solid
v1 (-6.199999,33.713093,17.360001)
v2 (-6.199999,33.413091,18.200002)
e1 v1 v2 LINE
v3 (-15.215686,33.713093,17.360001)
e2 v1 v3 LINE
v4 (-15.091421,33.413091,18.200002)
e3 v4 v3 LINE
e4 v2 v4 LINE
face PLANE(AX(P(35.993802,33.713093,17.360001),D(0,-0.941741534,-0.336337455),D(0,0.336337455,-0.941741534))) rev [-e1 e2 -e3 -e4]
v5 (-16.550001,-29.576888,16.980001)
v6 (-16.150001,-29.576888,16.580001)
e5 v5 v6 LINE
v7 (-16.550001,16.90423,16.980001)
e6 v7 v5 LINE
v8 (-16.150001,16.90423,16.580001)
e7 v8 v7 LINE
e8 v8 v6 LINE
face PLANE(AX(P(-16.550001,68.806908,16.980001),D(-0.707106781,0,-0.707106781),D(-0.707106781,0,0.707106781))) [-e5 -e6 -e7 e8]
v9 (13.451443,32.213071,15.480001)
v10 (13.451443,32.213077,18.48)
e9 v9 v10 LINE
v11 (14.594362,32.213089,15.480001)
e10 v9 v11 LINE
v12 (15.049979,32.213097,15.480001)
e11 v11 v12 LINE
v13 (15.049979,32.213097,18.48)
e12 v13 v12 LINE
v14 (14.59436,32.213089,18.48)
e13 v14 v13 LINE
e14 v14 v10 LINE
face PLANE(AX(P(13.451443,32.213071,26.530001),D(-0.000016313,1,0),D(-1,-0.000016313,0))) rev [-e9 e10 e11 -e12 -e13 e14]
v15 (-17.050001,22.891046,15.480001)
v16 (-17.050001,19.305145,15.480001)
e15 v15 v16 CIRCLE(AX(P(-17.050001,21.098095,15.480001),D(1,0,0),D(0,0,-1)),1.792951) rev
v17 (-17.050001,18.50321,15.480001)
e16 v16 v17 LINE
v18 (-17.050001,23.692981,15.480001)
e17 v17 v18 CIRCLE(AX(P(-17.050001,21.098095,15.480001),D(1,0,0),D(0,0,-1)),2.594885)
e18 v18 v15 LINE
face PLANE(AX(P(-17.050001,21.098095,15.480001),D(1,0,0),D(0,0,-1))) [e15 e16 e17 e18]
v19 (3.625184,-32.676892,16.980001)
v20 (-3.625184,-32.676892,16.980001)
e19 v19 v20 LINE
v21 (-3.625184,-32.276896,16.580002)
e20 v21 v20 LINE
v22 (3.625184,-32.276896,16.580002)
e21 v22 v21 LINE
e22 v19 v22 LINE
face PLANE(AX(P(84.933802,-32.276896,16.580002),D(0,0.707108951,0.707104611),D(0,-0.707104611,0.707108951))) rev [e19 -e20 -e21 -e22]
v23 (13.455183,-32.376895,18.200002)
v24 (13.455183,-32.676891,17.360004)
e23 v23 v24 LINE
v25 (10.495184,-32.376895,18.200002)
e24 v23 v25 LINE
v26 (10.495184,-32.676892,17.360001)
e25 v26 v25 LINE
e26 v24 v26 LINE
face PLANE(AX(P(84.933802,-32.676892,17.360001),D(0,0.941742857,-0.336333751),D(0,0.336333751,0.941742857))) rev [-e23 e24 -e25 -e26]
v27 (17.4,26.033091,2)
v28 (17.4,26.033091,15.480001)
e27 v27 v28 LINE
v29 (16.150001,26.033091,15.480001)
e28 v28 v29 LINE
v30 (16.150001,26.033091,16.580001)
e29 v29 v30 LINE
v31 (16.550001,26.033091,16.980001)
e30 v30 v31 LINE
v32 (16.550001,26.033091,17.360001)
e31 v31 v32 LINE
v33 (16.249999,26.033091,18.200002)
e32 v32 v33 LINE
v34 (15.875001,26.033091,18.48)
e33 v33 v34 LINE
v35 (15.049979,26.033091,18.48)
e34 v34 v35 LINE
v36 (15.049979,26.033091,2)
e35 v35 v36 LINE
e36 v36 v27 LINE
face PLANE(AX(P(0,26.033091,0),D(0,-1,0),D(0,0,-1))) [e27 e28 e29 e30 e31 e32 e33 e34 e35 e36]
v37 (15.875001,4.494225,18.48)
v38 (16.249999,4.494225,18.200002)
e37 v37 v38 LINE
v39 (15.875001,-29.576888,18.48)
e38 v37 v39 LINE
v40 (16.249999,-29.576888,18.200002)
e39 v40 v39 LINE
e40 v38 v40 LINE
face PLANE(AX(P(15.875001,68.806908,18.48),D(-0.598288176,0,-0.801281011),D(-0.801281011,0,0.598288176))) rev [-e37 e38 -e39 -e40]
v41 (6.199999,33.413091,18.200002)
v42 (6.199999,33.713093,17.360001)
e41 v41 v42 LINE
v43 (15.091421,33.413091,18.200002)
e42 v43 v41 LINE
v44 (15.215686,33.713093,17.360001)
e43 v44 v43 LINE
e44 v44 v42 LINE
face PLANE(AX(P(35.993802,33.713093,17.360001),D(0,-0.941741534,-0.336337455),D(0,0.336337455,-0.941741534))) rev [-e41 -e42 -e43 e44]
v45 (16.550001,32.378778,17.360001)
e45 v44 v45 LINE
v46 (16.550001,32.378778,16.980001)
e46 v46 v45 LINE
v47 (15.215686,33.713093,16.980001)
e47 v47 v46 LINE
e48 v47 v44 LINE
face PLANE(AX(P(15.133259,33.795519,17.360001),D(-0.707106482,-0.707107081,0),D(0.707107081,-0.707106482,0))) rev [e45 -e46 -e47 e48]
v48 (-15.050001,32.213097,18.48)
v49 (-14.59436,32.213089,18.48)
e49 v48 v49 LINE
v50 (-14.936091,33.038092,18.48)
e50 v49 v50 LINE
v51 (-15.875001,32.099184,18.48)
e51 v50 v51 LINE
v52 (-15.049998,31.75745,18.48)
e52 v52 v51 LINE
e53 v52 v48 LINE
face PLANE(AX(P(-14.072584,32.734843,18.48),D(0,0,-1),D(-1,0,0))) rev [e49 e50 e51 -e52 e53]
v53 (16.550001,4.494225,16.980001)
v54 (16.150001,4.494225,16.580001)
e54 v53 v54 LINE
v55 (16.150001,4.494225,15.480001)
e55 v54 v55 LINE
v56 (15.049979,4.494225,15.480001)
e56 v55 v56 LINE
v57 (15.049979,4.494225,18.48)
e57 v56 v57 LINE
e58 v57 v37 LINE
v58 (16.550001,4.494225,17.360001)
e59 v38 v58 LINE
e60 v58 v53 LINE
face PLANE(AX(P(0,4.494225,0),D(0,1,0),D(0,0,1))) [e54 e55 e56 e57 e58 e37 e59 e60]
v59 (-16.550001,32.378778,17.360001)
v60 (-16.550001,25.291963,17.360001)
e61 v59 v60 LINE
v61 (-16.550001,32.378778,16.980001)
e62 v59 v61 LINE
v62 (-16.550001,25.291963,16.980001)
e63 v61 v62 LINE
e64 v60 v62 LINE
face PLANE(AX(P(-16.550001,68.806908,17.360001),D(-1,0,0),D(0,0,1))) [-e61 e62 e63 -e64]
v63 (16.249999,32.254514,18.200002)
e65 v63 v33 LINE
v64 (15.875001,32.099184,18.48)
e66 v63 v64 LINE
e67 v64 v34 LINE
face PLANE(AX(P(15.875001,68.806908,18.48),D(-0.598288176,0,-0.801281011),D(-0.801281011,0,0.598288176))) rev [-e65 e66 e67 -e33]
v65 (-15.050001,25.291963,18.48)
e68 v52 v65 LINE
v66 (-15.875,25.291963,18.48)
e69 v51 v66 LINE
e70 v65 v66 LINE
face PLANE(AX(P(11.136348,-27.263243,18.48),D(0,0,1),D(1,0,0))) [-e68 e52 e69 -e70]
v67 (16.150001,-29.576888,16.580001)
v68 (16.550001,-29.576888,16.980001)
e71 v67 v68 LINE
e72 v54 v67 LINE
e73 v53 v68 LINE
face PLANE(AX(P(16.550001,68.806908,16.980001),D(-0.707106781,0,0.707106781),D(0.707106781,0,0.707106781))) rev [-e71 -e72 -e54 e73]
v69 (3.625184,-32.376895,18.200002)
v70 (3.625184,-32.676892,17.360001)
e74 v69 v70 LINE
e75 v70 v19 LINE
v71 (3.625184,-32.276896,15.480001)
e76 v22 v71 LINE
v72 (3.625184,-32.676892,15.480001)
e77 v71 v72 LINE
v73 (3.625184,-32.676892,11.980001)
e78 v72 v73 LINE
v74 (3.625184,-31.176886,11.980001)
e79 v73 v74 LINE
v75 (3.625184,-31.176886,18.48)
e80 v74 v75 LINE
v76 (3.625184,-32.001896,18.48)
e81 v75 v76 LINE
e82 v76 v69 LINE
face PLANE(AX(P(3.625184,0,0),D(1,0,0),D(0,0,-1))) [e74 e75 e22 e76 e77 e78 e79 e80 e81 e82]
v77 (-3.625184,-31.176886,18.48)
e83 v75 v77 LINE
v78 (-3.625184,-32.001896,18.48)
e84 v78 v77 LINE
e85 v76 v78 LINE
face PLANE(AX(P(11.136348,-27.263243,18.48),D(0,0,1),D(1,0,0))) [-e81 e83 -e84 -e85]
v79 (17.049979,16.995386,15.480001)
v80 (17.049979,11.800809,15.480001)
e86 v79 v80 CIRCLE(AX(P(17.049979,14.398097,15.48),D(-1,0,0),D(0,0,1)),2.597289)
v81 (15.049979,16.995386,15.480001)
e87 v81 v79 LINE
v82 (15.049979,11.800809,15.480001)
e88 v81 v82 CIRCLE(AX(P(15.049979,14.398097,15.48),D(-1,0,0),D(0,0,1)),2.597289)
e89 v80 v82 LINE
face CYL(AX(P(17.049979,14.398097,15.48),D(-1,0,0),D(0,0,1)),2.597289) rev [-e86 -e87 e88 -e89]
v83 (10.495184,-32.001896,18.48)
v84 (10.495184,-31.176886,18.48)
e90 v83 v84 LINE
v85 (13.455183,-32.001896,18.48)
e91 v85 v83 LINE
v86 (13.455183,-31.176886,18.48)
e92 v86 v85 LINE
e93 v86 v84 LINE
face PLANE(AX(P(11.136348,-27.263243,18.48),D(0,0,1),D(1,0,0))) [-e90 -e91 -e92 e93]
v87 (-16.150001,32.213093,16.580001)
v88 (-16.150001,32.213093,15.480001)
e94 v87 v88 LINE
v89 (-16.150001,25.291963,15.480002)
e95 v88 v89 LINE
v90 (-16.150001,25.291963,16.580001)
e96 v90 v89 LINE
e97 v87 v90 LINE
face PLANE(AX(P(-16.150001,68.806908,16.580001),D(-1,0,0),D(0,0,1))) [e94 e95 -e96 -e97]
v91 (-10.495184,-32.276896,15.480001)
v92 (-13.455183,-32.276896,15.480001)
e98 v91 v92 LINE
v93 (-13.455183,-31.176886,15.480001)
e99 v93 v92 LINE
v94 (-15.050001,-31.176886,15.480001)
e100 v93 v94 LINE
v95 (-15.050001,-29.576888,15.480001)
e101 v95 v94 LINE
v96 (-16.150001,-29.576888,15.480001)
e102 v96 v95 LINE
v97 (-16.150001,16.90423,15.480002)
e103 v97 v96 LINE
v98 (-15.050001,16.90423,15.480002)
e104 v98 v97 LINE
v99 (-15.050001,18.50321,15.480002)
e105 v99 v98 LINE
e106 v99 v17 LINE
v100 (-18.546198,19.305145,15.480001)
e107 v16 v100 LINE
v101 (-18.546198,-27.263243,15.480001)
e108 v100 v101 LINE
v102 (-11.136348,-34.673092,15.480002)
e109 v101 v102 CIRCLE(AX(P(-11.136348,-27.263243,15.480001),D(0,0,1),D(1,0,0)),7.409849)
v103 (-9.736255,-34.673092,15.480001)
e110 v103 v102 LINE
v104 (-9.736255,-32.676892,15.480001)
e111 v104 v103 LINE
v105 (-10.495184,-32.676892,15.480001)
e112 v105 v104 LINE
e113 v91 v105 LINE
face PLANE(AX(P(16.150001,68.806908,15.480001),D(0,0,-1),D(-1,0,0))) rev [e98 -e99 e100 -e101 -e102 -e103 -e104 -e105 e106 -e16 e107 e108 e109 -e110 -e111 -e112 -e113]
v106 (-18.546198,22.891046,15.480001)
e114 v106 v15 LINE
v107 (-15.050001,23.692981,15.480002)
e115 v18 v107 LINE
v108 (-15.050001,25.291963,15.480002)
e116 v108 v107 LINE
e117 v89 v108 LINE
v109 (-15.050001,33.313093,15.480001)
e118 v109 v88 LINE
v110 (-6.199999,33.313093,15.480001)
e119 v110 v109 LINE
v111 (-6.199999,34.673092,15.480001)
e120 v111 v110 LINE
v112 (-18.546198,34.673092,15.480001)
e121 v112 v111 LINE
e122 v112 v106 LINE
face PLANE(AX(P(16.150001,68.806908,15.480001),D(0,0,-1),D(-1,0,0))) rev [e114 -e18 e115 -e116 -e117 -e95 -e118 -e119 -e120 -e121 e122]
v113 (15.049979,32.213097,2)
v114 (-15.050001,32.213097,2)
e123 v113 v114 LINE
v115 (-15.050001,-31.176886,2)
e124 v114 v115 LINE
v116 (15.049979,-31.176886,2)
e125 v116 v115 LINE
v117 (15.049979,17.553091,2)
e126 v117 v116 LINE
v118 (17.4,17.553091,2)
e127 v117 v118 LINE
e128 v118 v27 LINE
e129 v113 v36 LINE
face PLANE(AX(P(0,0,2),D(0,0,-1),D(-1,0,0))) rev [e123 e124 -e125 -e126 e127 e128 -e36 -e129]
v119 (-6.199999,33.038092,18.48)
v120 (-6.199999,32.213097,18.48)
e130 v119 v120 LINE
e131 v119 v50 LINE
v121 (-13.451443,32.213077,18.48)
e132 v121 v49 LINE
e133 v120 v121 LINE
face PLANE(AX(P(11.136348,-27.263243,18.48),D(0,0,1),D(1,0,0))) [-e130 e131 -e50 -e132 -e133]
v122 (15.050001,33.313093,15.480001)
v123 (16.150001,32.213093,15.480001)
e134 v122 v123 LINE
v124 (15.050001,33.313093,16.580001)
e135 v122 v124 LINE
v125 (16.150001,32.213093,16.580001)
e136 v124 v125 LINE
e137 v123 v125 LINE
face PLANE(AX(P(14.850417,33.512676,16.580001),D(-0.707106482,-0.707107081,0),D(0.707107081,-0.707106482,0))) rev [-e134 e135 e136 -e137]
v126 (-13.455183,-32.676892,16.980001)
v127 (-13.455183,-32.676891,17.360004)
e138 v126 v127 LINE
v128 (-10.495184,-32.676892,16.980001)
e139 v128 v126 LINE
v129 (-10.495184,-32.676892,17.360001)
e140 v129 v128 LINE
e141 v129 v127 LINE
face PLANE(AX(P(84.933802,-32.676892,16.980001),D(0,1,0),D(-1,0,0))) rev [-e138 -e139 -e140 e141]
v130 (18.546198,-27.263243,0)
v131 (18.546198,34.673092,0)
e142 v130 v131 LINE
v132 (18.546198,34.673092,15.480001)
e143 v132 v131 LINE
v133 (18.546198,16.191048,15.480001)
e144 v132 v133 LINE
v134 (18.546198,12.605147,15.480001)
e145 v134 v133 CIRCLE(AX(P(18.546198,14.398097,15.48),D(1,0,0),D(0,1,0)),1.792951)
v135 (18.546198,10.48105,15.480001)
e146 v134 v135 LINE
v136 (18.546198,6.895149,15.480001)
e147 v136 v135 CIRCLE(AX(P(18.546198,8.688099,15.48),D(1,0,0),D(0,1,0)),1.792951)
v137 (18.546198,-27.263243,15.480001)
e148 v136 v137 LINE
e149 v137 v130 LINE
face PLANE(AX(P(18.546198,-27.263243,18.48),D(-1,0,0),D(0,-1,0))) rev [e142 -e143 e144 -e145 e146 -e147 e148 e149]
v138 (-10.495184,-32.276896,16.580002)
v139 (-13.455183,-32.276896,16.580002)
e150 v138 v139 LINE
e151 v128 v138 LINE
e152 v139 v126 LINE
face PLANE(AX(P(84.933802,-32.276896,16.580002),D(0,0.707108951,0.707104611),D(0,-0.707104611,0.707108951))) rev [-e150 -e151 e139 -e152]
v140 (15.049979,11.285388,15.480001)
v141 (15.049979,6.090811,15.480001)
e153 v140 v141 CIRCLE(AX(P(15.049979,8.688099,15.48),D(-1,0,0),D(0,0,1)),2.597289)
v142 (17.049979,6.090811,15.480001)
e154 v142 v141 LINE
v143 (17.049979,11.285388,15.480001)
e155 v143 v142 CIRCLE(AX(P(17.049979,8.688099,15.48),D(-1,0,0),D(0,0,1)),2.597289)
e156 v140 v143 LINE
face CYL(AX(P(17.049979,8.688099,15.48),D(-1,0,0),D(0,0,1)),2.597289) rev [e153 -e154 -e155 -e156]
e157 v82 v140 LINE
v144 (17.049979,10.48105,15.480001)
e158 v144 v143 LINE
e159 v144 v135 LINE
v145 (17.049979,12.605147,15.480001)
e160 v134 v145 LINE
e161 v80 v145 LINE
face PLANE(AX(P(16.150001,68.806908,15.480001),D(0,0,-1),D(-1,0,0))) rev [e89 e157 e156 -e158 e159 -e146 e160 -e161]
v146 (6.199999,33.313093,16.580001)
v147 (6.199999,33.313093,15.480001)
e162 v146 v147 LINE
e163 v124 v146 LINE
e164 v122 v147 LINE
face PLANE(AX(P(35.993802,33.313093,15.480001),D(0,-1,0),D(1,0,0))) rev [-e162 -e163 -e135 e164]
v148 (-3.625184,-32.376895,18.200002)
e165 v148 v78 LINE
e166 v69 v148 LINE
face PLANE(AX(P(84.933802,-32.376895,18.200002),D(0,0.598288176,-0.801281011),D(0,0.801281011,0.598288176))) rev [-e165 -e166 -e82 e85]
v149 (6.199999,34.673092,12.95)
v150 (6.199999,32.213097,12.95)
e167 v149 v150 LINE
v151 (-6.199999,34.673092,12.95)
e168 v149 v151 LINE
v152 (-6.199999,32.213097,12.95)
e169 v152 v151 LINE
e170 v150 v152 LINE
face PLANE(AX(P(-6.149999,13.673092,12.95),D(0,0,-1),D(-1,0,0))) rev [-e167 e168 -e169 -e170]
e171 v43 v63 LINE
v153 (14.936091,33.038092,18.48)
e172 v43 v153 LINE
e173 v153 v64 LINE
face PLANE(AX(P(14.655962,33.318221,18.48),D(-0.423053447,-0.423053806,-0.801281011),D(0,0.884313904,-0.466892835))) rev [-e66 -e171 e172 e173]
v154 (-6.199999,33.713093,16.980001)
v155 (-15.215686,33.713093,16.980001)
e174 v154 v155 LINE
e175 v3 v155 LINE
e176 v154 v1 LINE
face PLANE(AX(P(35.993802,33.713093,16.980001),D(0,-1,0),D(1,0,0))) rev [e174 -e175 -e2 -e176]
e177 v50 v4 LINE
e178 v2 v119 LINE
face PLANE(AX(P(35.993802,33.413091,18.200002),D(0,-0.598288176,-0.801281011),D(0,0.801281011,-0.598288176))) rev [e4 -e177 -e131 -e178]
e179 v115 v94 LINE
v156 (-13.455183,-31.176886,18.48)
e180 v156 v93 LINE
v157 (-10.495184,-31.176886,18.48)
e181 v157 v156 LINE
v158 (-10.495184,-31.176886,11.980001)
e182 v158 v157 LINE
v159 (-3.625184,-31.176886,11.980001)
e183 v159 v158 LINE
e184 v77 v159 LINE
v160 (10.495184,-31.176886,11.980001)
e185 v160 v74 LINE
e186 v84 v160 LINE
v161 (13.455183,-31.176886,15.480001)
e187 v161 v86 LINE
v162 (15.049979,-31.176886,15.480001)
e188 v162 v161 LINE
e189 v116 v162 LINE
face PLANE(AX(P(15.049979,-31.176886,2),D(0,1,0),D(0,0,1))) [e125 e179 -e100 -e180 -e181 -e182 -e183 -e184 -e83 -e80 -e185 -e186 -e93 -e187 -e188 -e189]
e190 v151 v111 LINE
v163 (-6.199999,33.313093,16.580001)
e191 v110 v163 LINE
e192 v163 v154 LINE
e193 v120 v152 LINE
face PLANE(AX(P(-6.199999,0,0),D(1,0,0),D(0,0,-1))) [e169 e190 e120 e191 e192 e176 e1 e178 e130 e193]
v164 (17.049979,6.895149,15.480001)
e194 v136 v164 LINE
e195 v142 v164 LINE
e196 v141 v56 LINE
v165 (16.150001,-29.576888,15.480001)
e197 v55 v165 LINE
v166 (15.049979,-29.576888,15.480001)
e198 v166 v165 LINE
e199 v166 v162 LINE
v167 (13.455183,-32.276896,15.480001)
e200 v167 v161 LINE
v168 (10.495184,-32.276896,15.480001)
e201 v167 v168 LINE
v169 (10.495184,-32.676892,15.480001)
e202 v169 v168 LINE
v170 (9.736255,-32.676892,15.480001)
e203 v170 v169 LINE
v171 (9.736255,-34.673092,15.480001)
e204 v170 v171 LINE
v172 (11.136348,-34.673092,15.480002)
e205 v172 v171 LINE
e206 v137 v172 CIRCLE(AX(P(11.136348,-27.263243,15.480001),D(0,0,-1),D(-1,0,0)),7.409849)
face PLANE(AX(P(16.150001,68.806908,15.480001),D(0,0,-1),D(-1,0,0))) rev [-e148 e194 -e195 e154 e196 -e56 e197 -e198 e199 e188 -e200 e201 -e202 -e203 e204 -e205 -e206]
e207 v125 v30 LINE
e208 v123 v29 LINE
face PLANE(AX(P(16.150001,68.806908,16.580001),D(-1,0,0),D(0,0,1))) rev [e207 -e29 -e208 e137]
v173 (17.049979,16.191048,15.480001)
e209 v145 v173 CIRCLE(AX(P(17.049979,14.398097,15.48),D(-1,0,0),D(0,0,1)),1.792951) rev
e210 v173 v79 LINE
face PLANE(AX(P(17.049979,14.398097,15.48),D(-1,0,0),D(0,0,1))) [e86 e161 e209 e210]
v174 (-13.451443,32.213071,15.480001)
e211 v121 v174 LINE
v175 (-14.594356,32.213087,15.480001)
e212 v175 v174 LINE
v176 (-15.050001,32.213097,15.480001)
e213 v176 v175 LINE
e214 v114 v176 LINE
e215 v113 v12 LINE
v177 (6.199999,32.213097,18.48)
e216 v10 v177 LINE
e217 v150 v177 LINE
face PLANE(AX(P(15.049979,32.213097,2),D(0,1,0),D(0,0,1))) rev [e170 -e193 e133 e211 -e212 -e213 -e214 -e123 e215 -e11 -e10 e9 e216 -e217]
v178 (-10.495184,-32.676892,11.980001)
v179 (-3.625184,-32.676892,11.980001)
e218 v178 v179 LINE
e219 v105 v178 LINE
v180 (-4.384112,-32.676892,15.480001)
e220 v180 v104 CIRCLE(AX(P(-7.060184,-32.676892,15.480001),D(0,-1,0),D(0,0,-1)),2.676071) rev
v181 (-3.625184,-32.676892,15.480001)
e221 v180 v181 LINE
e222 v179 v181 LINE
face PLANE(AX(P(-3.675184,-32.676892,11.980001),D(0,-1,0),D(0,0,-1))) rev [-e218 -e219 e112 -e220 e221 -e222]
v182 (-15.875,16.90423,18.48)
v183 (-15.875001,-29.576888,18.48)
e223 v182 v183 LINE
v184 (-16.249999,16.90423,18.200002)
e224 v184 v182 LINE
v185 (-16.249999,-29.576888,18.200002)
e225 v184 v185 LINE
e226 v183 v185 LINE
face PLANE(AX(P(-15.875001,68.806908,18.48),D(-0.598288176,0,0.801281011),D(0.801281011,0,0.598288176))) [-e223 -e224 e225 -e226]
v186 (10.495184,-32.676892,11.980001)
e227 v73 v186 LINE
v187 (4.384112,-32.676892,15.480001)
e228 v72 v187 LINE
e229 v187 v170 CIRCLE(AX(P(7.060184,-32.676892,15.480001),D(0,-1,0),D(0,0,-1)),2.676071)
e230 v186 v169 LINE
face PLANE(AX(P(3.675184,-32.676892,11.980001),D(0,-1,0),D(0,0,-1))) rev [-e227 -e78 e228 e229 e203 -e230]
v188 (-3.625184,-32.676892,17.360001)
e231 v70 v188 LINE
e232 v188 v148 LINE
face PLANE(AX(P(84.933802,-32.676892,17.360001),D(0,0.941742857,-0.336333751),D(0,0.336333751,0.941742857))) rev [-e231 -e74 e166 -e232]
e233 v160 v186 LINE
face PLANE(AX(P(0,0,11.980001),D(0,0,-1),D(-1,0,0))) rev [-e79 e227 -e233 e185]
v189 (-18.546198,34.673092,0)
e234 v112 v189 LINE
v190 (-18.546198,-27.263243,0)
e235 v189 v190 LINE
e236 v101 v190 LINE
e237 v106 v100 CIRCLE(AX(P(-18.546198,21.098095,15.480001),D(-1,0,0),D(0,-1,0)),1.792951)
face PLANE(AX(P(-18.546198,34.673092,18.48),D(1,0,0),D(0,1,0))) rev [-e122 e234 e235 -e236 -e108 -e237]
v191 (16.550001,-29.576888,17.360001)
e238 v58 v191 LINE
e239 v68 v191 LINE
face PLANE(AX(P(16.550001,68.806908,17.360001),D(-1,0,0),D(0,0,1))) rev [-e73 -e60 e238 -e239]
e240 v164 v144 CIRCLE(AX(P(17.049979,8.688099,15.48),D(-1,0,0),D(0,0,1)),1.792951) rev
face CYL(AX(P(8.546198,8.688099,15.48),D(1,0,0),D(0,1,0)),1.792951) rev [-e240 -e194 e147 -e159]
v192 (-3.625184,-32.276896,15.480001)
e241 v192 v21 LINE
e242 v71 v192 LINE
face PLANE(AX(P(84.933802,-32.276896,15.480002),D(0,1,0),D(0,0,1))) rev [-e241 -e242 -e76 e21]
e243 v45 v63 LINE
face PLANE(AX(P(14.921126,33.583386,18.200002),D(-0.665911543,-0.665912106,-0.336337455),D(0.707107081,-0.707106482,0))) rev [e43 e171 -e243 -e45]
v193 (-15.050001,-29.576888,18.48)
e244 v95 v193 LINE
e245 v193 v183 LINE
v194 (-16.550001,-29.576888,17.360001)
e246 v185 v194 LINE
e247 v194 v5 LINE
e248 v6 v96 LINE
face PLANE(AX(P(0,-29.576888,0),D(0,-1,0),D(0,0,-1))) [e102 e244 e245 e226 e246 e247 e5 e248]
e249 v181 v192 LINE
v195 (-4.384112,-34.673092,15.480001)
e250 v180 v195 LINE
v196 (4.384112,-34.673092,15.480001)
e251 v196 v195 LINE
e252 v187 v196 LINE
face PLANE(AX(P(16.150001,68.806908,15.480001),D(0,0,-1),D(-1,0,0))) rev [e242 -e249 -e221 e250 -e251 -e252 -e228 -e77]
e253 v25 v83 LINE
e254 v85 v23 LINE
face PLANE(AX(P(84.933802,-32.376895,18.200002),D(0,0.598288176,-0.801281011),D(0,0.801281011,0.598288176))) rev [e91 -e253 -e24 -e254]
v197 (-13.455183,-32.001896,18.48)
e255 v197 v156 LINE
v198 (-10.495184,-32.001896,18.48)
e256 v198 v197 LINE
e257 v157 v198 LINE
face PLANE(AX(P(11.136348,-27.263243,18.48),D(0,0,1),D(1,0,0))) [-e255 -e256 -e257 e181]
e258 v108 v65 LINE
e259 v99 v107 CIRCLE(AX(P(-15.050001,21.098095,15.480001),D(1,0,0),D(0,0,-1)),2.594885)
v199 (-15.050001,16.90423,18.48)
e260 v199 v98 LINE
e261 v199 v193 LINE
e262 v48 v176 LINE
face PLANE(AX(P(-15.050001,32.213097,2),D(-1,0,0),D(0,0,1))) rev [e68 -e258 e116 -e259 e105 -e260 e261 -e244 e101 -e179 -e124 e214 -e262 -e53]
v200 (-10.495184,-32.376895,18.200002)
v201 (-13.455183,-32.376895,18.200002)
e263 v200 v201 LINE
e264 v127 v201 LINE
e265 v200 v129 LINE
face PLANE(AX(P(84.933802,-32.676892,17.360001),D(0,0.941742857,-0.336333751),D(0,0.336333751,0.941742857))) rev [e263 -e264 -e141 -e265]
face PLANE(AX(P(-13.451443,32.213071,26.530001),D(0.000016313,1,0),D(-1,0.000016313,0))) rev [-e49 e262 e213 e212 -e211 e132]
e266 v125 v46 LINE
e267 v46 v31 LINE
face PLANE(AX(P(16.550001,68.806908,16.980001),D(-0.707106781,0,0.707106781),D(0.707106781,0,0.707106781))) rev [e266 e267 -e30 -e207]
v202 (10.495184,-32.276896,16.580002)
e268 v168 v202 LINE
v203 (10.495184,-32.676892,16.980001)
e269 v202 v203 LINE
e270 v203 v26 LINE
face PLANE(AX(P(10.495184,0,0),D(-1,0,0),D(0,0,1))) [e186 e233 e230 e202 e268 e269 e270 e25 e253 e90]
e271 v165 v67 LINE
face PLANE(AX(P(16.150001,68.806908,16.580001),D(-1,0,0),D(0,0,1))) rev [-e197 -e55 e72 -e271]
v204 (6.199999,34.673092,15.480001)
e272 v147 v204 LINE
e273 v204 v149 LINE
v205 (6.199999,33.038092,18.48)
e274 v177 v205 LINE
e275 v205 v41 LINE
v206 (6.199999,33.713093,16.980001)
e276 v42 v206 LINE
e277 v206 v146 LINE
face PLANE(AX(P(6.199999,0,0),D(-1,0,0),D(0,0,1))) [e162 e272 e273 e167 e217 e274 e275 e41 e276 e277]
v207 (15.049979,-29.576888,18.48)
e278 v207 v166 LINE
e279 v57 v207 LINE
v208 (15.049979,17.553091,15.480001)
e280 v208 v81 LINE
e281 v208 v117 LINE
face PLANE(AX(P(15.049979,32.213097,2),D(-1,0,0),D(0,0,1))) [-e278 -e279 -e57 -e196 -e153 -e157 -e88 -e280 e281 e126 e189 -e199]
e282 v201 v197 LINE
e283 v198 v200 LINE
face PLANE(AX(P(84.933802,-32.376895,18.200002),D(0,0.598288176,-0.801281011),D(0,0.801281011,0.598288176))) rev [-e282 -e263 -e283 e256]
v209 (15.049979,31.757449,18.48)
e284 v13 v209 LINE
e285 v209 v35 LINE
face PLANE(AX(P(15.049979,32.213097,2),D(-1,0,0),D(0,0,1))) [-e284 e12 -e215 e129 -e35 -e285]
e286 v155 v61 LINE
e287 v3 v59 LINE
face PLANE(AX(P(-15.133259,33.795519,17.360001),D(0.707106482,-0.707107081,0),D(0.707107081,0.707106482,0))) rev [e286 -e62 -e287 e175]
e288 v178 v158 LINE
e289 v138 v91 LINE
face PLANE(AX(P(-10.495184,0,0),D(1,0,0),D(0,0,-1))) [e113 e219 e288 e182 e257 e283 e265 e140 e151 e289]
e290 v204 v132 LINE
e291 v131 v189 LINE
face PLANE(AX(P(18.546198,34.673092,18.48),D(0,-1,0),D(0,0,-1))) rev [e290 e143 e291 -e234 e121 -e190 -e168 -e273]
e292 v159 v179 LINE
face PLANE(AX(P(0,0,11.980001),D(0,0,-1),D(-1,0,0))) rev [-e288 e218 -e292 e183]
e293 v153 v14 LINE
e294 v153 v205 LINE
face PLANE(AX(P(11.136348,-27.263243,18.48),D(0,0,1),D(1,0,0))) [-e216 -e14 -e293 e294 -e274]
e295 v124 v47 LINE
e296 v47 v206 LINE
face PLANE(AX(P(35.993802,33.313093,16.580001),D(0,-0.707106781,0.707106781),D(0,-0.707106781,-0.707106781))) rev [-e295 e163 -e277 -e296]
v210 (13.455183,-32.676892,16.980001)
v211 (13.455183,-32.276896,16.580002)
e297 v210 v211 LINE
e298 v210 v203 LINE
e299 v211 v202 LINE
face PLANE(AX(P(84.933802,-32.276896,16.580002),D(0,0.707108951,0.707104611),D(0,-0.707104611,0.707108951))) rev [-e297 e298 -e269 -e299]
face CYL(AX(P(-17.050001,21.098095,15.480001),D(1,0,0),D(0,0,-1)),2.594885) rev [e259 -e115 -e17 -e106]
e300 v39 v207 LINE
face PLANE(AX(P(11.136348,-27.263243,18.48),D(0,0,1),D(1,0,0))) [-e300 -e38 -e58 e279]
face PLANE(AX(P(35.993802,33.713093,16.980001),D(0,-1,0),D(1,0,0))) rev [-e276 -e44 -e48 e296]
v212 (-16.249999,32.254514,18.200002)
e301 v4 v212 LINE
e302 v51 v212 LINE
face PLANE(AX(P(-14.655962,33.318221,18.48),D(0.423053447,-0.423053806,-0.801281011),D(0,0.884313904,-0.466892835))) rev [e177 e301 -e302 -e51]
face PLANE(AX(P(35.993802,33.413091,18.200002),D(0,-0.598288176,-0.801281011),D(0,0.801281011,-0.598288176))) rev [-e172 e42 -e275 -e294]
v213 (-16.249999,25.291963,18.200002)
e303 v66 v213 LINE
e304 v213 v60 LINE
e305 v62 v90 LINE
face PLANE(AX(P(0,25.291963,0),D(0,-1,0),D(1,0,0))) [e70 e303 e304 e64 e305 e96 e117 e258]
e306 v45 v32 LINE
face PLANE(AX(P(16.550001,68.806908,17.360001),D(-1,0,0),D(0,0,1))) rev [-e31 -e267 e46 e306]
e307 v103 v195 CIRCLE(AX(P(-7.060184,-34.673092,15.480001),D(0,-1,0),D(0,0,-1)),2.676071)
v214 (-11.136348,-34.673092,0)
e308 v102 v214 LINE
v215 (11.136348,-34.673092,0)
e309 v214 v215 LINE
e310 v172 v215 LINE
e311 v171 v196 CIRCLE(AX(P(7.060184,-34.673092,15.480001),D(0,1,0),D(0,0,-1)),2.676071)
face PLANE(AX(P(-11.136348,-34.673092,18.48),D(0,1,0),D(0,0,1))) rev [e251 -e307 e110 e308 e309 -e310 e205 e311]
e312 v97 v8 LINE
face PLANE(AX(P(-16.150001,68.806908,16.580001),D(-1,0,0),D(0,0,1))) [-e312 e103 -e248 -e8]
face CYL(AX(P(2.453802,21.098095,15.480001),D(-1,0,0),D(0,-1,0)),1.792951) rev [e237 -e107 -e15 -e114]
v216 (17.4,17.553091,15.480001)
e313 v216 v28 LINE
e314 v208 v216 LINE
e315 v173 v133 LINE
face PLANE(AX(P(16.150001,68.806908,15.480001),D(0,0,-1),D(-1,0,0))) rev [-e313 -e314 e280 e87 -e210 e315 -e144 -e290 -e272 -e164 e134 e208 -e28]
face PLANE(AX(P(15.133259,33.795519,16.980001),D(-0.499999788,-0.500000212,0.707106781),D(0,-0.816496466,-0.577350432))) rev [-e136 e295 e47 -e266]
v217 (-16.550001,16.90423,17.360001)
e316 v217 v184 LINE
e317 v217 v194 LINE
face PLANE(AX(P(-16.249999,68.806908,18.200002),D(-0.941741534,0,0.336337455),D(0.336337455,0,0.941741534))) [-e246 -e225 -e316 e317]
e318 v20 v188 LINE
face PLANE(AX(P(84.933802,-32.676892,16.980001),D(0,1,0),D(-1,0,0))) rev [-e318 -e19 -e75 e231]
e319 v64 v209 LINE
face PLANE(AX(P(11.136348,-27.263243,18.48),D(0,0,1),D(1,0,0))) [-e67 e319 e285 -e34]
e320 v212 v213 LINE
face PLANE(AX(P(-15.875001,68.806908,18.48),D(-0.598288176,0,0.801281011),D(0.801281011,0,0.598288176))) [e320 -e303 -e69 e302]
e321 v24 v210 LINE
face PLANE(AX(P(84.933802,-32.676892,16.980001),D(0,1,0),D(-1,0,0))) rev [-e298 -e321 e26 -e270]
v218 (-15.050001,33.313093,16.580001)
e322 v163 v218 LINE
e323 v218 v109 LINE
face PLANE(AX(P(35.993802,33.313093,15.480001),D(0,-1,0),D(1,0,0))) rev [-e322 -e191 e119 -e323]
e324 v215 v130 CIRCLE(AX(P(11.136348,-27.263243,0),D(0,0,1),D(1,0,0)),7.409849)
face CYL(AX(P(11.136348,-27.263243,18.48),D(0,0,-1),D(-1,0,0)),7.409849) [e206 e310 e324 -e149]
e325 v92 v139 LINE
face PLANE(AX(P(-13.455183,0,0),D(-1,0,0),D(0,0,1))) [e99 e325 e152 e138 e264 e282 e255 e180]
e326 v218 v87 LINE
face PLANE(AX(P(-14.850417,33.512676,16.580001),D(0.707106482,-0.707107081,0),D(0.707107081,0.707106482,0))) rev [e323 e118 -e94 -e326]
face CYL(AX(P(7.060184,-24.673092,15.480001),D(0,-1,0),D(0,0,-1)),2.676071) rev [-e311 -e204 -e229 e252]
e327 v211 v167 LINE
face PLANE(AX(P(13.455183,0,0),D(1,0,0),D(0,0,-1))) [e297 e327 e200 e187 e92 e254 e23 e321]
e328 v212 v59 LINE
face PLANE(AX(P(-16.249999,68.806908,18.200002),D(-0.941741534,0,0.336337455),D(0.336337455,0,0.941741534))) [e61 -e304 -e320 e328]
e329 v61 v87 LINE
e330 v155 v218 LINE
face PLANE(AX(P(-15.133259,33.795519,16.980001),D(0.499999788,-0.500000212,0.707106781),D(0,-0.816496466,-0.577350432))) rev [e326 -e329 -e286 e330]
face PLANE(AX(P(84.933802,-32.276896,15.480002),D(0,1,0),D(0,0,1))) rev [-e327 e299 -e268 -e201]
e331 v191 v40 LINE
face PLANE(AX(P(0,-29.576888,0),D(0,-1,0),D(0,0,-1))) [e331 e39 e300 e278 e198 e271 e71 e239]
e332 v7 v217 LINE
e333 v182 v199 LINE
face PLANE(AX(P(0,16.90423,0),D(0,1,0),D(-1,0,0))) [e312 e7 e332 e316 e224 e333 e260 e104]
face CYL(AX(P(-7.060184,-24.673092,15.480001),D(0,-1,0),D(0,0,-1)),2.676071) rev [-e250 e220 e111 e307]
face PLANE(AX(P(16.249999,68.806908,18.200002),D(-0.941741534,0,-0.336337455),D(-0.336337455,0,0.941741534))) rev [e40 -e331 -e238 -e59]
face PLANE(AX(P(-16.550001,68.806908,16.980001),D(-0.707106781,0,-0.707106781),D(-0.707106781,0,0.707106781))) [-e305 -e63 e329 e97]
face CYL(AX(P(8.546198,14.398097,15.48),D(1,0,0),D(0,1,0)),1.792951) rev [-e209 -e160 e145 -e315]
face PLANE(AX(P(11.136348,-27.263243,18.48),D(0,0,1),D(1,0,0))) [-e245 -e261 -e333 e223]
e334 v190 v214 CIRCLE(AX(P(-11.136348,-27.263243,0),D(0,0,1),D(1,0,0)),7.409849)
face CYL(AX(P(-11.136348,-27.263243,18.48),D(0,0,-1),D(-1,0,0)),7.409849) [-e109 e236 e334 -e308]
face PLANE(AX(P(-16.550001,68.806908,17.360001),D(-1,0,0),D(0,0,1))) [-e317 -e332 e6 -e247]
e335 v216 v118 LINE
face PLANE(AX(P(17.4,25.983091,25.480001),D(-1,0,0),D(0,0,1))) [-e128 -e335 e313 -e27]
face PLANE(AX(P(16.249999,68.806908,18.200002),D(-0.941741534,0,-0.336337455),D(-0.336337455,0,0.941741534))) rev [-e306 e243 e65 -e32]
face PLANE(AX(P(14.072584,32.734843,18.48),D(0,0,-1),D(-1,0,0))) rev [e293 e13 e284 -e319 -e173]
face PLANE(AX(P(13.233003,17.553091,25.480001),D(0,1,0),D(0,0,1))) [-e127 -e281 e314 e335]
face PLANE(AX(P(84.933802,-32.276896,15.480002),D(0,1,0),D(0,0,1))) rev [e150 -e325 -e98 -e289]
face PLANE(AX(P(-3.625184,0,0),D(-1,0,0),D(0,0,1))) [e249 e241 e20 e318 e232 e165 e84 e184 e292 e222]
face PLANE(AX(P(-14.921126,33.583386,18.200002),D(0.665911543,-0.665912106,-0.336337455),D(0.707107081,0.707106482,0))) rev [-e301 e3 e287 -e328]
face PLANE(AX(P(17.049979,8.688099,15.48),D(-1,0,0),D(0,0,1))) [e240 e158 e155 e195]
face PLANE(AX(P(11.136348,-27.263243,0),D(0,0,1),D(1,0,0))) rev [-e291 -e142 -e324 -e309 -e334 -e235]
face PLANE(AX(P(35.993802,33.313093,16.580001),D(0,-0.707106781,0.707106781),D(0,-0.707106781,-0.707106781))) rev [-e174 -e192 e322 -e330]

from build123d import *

# Parameters (mm, degrees)
BOSS_EXTRUDE1_DEPTH     = 18.48
SKETCH3_W               = 30.099980533
SKETCH3_H               = 63.389983028
CUT_EXTRUDE1_DEPTH      = 16.48
CUT_EXTRUDE3_DEPTH      = 103.48
CUT_EXTRUDE4_DEPTH      = 103.48
CUT_EXTRUDE5_DEPTH      = 54.54
CUT_EXTRUDE6_DEPTH      = 10
SKETCH11_W              = 2.999998629
SKETCH11_H              = 20.697738044
CUT_EXTRUDE7_DEPTH      = 10
SKETCH12_R              = 1.792950556
CUT_EXTRUDE8_DEPTH      = 10
CUT_EXTRUDE9_DEPTH      = 10
CUT_EXTRUDE9_DEPTH_BACK = 13.480001
SKETCH13_W              = 4.166997139
SKETCH13_H              = 8.430000395
SKETCH14_R              = 2.597288525
CUT_EXTRUDE10_DEPTH     = 2
SKETCH15_W              = 12.299997266
SKETCH15_H              = 5.529999733
CUT_EXTRUDE11_DEPTH     = 21
SKETCH16_R              = 1.792950556
CUT_EXTRUDE12_DEPTH     = 21
SKETCH17_W              = 2.999998645
SKETCH17_H              = 8.287733437
CUT_EXTRUDE13_DEPTH     = 21
SKETCH18_R              = 2.594885252
CUT_EXTRUDE14_DEPTH     = 2
SKETCH20_W              = 6.770000094
SKETCH20_H              = 1.500006354
CUT_EXTRUDE15_DEPTH     = 3.5
CUT_EXTRUDE16_DEPTH     = 2.999998629
SKETCH23_W              = 3.697606461
SKETCH23_H              = 2.985965669
CUT_EXTRUDE18_DEPTH     = 8.5
CUT_EXTRUDE19_DEPTH     = 0.05
CUT_EXTRUDE20_DEPTH     = 0.05
CUT_EXTRUDE21_DEPTH     = 0.05
CUT_EXTRUDE22_START     = -0.05
CUT_EXTRUDE22_DEPTH     = 0.05
CUT_EXTRUDE23_DEPTH     = 0.05
CUT_EXTRUDE24_DEPTH     = 0.05
CUT_EXTRUDE25_DEPTH     = 0.05
CUT_EXTRUDE26_DEPTH     = 0.05
CUT_EXTRUDE27_DEPTH     = 0.05
CUT_EXTRUDE28_START     = -0.05
CUT_EXTRUDE28_DEPTH     = 0.05
CUT_EXTRUDE29_DEPTH     = 0.05
CUT_EXTRUDE30_DEPTH     = 0.05
CUT_EXTRUDE31_DEPTH     = 0.05
CUT_EXTRUDE32_DEPTH     = 0.05
CUT_EXTRUDE33_DEPTH     = 11.05
CUT_EXTRUDE34_DEPTH     = 11.05


# Read off the part's stored shape, not the designer's step: Cut-Extrude16, Cut-Extrude22, Cut-Extrude28
with BuildPart() as part:
    # Sketch1 → Boss-Extrude1 (new body)
    with BuildSketch(Plane.XY):
        with BuildLine():
            Line((18.546197564, -27.263243275), (18.546197564, 34.673092364))
            Line((18.546197564, 34.673092364), (-18.546197564, 34.673092364))
            Line((-18.546197564, 34.673092364), (-18.546197564, -27.263243275))
            ThreePointArc((-18.546197564, -27.263243275), (-16.375903013, -32.502797813), (-11.136348475, -34.673092364))
            Line((-11.136348475, -34.673092364), (11.136348475, -34.673092364))
            ThreePointArc((11.136348475, -34.673092364), (16.375903013, -32.502797813), (18.546197564, -27.263243275))
        make_face()
    extrude(amount=BOSS_EXTRUDE1_DEPTH)

    # Sketch3 → Cut-Extrude1 (cut)
    with BuildSketch(Plane.XY.offset(18.48)):
        with Locations((-1.1177e-05, 0.518105401)):
            Rectangle(SKETCH3_W, SKETCH3_H)
    extrude(amount=-CUT_EXTRUDE1_DEPTH, mode=Mode.SUBTRACT)

    # Sketch5 → Cut-Extrude3 (cut)
    with BuildSketch(Plane.XZ.offset(34.673092364)):
        Polygon((16.150001437, 15.480001371), (18.546197564, 15.480001371), (18.546197564, 18.48), (15.875000507, 18.48), (16.249999404, 18.200001593), (16.550000757, 17.360000785), (16.550000757, 16.980000685), (16.150001437, 16.580001365), align=None)
    cut_extrude3 = extrude(amount=-CUT_EXTRUDE3_DEPTH, mode=Mode.SUBTRACT)

    # Mirror2: Cut-Extrude3 across plane
    add(cut_extrude3.mirror(Plane(origin=(0, 0, 0), x_dir=(0, 0, 1), z_dir=(1, 0, 0))), mode=Mode.SUBTRACT)

    # Sketch6 → Cut-Extrude4 (cut)
    with BuildSketch(Plane.ZY.offset(18.546197564)):
        Polygon((15.48000154, -32.276896237), (15.48000154, -34.673092364), (18.48, -34.673092364), (18.48, -32.001895942), (18.200001593, -32.376894839), (17.360000785, -32.676892467), (16.980000685, -32.676892467), (16.580002, -32.276896237), align=None)
    extrude(amount=-CUT_EXTRUDE4_DEPTH, mode=Mode.SUBTRACT)

    # Sketch8 → Cut-Extrude5 (cut)
    with BuildSketch(Plane.ZY.offset(18.546197564)):
        Polygon((15.480001371, 33.313093184), (15.480001371, 34.673092364), (18.48, 34.673092364), (18.48, 33.038092254), (18.200001593, 33.413091151), (17.360000785, 33.713092504), (16.980000685, 33.713092504), (16.580001365, 33.313093184), align=None)
    extrude(amount=-CUT_EXTRUDE5_DEPTH, mode=Mode.SUBTRACT)

    # Sketch9 → Cut-Extrude6 (cut)
    with BuildSketch(Plane.XZ.offset(34.673092364)):
        with BuildLine():
            Line((-10.44518366, 18.480000048), (-3.675183566, 18.480000048))
            Line((-3.675183566, 18.480000048), (-3.675183566, 15.480001419))
            Line((-3.675183566, 15.480001419), (-4.384112223, 15.480001419))
            ThreePointArc((-4.384112223, 15.480001419), (-7.060183613, 12.803930029), (-9.736255003, 15.480001419))
            Line((-9.736255003, 15.480001419), (-10.44518366, 15.480001419))
            Line((-10.44518366, 15.480001419), (-10.44518366, 18.480000048))
        make_face()
    cut_extrude6 = extrude(amount=-CUT_EXTRUDE6_DEPTH, mode=Mode.SUBTRACT)

    # Mirror3: Cut-Extrude6 across plane
    add(cut_extrude6.mirror(Plane(origin=(0, 0, 0), x_dir=(0, 0, 1), z_dir=(1, 0, 0))), mode=Mode.SUBTRACT)

    # Sketch11 → Cut-Extrude7 (cut)
    with BuildSketch(Plane(origin=(18.546197564, 0, 0), x_dir=(0, 0, -1), z_dir=(1, 0, 0))):
        with Locations((-16.980000686, 14.89309402)):
            Rectangle(SKETCH11_W, SKETCH11_H)
    extrude(amount=-CUT_EXTRUDE7_DEPTH, mode=Mode.SUBTRACT)

    # Sketch12 → Cut-Extrude8 (cut)
    with BuildSketch(Plane(origin=(18.546197564, 0, 0), x_dir=(0, 0, -1), z_dir=(1, 0, 0))):
        with Locations((-15.479999974, 14.398097469)):
            Circle(SKETCH12_R)
        with Locations((-15.479999974, 8.688099159)):
            Circle(SKETCH12_R)
    extrude(amount=-CUT_EXTRUDE8_DEPTH, mode=Mode.SUBTRACT)

    # Sketch13 → Cut-Extrude9 (cut, two sides: drawn at the far end of the back side and taken through both)
    with BuildSketch(Plane.XY.offset(15.480001371).offset(-CUT_EXTRUDE9_DEPTH_BACK)):
        with Locations((15.316501675, 21.768090724)):
            Rectangle(SKETCH13_W, SKETCH13_H)
    extrude(amount=CUT_EXTRUDE9_DEPTH + CUT_EXTRUDE9_DEPTH_BACK, mode=Mode.SUBTRACT)

    # Sketch14 → Cut-Extrude10 (cut)
    with BuildSketch(Plane.ZY.offset(-15.04997909)):
        with Locations((15.479999974, 14.398097469)):
            Circle(SKETCH14_R)
        with Locations((15.479999974, 8.688099159)):
            Circle(SKETCH14_R)
    extrude(amount=-CUT_EXTRUDE10_DEPTH, mode=Mode.SUBTRACT)

    # Sketch15 → Cut-Extrude11 (cut)
    with BuildSketch(Plane(origin=(0, 34.673092364, 0), x_dir=(1, 0, 0), z_dir=(0, 1, 0))):
        with Locations((0, -15.715000134)):
            Rectangle(SKETCH15_W, SKETCH15_H)
    extrude(amount=-CUT_EXTRUDE11_DEPTH, mode=Mode.SUBTRACT)

    # Sketch16 → Cut-Extrude12 (cut)
    with BuildSketch(Plane.ZY.offset(18.546197564)):
        with Locations(Location((15.480001371, 21.0980954, 0), (0, 0, 270))):
            Circle(SKETCH16_R)
    extrude(amount=-CUT_EXTRUDE12_DEPTH, mode=Mode.SUBTRACT)

    # Sketch17 → Cut-Extrude13 (cut)
    with BuildSketch(Plane.ZY.offset(18.546197564)):
        with Locations((16.980000839, 21.098096485)):
            Rectangle(SKETCH17_W, SKETCH17_H)
    extrude(amount=-CUT_EXTRUDE13_DEPTH, mode=Mode.SUBTRACT)

    # Sketch18 → Cut-Extrude14 (cut)
    with BuildSketch(Plane(origin=(-15.050001443, 0, 0), x_dir=(0, 0, -1), z_dir=(1, 0, 0))):
        with Locations((-15.480001371, 21.0980954)):
            Circle(SKETCH18_R)
    extrude(amount=-CUT_EXTRUDE14_DEPTH, mode=Mode.SUBTRACT)

    # Sketch20 → Cut-Extrude15 (cut)
    with BuildSketch(Plane.XY.offset(15.480001371)):
        with Locations((7.060183613, -31.92688929)):
            Rectangle(SKETCH20_W, SKETCH20_H)
        with Locations((-7.060183613, -31.92688929)):
            Rectangle(SKETCH20_W, SKETCH20_H)
    extrude(amount=-CUT_EXTRUDE15_DEPTH, mode=Mode.SUBTRACT)

    # Cut-Extrude16 outline → Cut-Extrude16 (cut)
    with BuildSketch(Plane.XY.offset(15.480001371)):
        with BuildLine():
            Line((13.505182746, -32.676892467), (16.195821367, -32.676892467))
            ThreePointArc((16.195821367, -32.676892467), (16.375904613, -32.502796213), (16.550000757, -32.32271286))
            Line((16.550000757, -32.32271286), (16.550000757, -29.626887815))
            Line((16.550000757, -29.626887815), (15.04997909, -29.626887815))
            Line((15.04997909, -29.626887815), (15.04997909, -31.176886113))
            Line((15.04997909, -31.176886113), (13.505182746, -31.176886113))
            Line((13.505182746, -31.176886113), (13.505182746, -32.676892467))
        make_face()
    cut_extrude16 = extrude(amount=CUT_EXTRUDE16_DEPTH, mode=Mode.SUBTRACT)

    # Mirror4: Cut-Extrude16 across plane
    add(cut_extrude16.mirror(Plane(origin=(0, 0, 0), x_dir=(0, 0, 1), z_dir=(1, 0, 0))), mode=Mode.SUBTRACT)

    # Sketch23 → Cut-Extrude18 (cut)
    with BuildSketch(Plane.XY.offset(15.480001371)):
        with Locations((15.300246124, 32.22010967)):
            Rectangle(SKETCH23_W, SKETCH23_H)
    cut_extrude18 = extrude(amount=CUT_EXTRUDE18_DEPTH, mode=Mode.SUBTRACT)

    # Sweep1: sweep along a path in Sketch24
    with BuildLine(Plane.XY.offset(15.480001371)) as sweep1_path:
        Line((16.150001437, 30.727126835), (16.150001437, 32.21309319))
        Line((16.150001437, 32.21309319), (15.050000511, 33.313093184))
        Line((15.050000511, 33.313093184), (13.451442893, 33.313093184))
    # Sketch25 → Sweep1 (sweep)
    with BuildSketch(Plane(origin=(0, 30.727126835, 0), x_dir=(1, 0, 0), z_dir=(0, 1, 0))):
        Polygon((16.150001437, -16.580001365), (16.150001437, -15.480001371), (15.04997909, -15.480001371), (15.04997909, -18.48), (15.875000507, -18.48), (16.249999404, -18.200001593), (16.550000757, -17.360000785), (16.550000757, -16.980000685), align=None)
    sweep1 = sweep(path=sweep1_path.line, transition=Transition.RIGHT)

    # Mirror6: Cut-Extrude18, Sweep1 across plane
    add(cut_extrude18.mirror(Plane(origin=(0, 0, 0), x_dir=(0, 0, 1), z_dir=(1, 0, 0))), mode=Mode.SUBTRACT)
    add(sweep1.mirror(Plane(origin=(0, 0, 0), x_dir=(0, 0, 1), z_dir=(1, 0, 0))))

    # Sketch26 → Cut-Extrude19 (cut)
    with BuildSketch(Plane.XZ.offset(-25.241963203)):
        Polygon((-15.050001443, 18.480000161), (-15.875000291, 18.480000161), (-16.249999404, 18.200001593), (-16.550000757, 17.360000785), (-16.550000757, 16.980000685), (-16.150001437, 16.580001365), (-16.150001437, 15.480001516), (-15.050001443, 15.480001516), align=None)
    extrude(amount=-CUT_EXTRUDE19_DEPTH, mode=Mode.SUBTRACT)

    # Sketch27 → Cut-Extrude20 (cut)
    with BuildSketch(Plane(origin=(0, 16.954229766, 0), x_dir=(1, 0, 0), z_dir=(0, 1, 0))):
        Polygon((-15.050001443, -15.480001516), (-16.150001437, -15.480001516), (-16.150001437, -16.580001365), (-16.550000757, -16.980000685), (-16.550000757, -17.360000785), (-16.249999404, -18.200001593), (-15.875000291, -18.480000161), (-15.050001443, -18.480000161), align=None)
    extrude(amount=-CUT_EXTRUDE20_DEPTH, mode=Mode.SUBTRACT)

    # Sketch28 → Cut-Extrude21 (cut)
    with BuildSketch(Plane.XZ.offset(29.626887815)):
        Polygon((-15.050001443, 18.48), (-15.875000507, 18.48), (-16.249999404, 18.200001593), (-16.550000757, 17.360000785), (-16.550000757, 16.980000685), (-16.150001437, 16.580001365), (-16.150001437, 15.480001371), (-15.050001443, 15.480001371), align=None)
    extrude(amount=-CUT_EXTRUDE21_DEPTH, mode=Mode.SUBTRACT)

    # Cut-Extrude22 outline → Cut-Extrude22 (cut)
    with BuildSketch(Plane.ZY.offset(13.505182746).offset(CUT_EXTRUDE22_START)):
        Polygon((18.200001593, -32.376894839), (18.480000048, -32.001895878), (18.48, -31.176886113), (15.480001371, -31.176886113), (15.480001371, -32.276896237), (16.580002, -32.276896237), (16.980000685, -32.676892467), (17.360004046, -32.676892467), align=None)
    extrude(amount=CUT_EXTRUDE22_DEPTH, mode=Mode.SUBTRACT)

    # Sketch30 → Cut-Extrude23 (cut)
    with BuildSketch(Plane.XZ.offset(29.626887815)):
        Polygon((15.04997909, 15.480001371), (16.150001437, 15.480001371), (16.150001437, 16.580001365), (16.550000757, 16.980000685), (16.550000757, 17.360000785), (16.249999404, 18.200001593), (15.875000507, 18.48), (15.04997909, 18.48), align=None)
    extrude(amount=-CUT_EXTRUDE23_DEPTH, mode=Mode.SUBTRACT)

    # Sketch31 → Cut-Extrude24 (cut)
    with BuildSketch(Plane(origin=(-10.44518366, 0, 0), x_dir=(0, 0, -1), z_dir=(1, 0, 0))):
        Polygon((-11.980001371, -31.176886113), (-18.480000048, -31.176886113), (-18.480000048, -32.001895878), (-18.200001593, -32.376894839), (-17.360000785, -32.676892467), (-16.980000685, -32.676892467), (-16.580002, -32.276896237), (-15.480001371, -32.276896237), (-15.480001371, -32.676892467), (-11.980001371, -32.676892467), align=None)
    extrude(amount=-CUT_EXTRUDE24_DEPTH, mode=Mode.SUBTRACT)

    # Sketch32 → Cut-Extrude25 (cut)
    with BuildSketch(Plane.ZY.offset(3.675183566)):
        Polygon((18.480000048, -31.176886113), (11.980001371, -31.176886113), (11.980001371, -32.676892467), (15.480001371, -32.676892467), (15.480001371, -32.276896237), (16.580002, -32.276896237), (16.980000685, -32.676892467), (17.360000785, -32.676892467), (18.200001593, -32.376894839), (18.480000048, -32.001895878), align=None)
    extrude(amount=-CUT_EXTRUDE25_DEPTH, mode=Mode.SUBTRACT)

    # Sketch33 → Cut-Extrude26 (cut)
    with BuildSketch(Plane(origin=(3.675183566, 0, 0), x_dir=(0, 0, -1), z_dir=(1, 0, 0))):
        Polygon((-18.480000048, -31.176886113), (-18.480000048, -32.001895878), (-18.200001593, -32.376894839), (-17.360000785, -32.676892467), (-16.980000685, -32.676892467), (-16.580002, -32.276896237), (-15.480001371, -32.276896237), (-15.480001371, -32.676892467), (-11.980001371, -32.676892467), (-11.980001371, -31.176886113), align=None)
    extrude(amount=-CUT_EXTRUDE26_DEPTH, mode=Mode.SUBTRACT)

    # Sketch34 → Cut-Extrude27 (cut)
    with BuildSketch(Plane.ZY.offset(-10.44518366)):
        Polygon((18.480000048, -31.176886113), (11.980001371, -31.176886113), (11.980001371, -32.676892467), (15.480001371, -32.676892467), (15.480001371, -32.276896237), (16.580002, -32.276896237), (16.980000685, -32.676892467), (17.360000785, -32.676892467), (18.200001593, -32.376894839), (18.480000048, -32.001895878), align=None)
    extrude(amount=-CUT_EXTRUDE27_DEPTH, mode=Mode.SUBTRACT)

    # Cut-Extrude28 outline → Cut-Extrude28 (cut)
    with BuildSketch(Plane(origin=(13.505182746, 0, 0), x_dir=(0, 0, -1), z_dir=(1, 0, 0)).offset(CUT_EXTRUDE28_START)):
        Polygon((-15.480001371, -31.176886113), (-18.480000048, -31.176886113), (-18.48, -32.001895942), (-18.200001593, -32.376894839), (-17.360000785, -32.676892467), (-16.980000685, -32.676892467), (-16.580002, -32.276896237), (-15.480001371, -32.276896237), align=None)
    extrude(amount=CUT_EXTRUDE28_DEPTH, mode=Mode.SUBTRACT)

    # Sketch36 → Cut-Extrude29 (cut)
    with BuildSketch(Plane(origin=(0, 4.544224998, 0), x_dir=(1, 0, 0), z_dir=(0, 1, 0))):
        Polygon((15.04997909, -15.480001371), (15.04997909, -18.48), (15.875000507, -18.48), (16.249999404, -18.200001593), (16.550000757, -17.360000785), (16.550000757, -16.980000685), (16.150001437, -16.580001365), (16.150001437, -15.480001371), align=None)
    extrude(amount=-CUT_EXTRUDE29_DEPTH, mode=Mode.SUBTRACT)

    # Sketch37 → Cut-Extrude30 (cut)
    with BuildSketch(Plane.XZ.offset(-25.983090921)):
        Polygon((17.400000245, 15.480001371), (16.150001437, 15.480001371), (16.150001437, 16.580001365), (16.550000757, 16.980000685), (16.550000757, 17.360000785), (16.249999404, 18.200001593), (15.875000507, 18.48), (15.04997909, 18.48), (15.04997909, 2), (17.400000245, 2), align=None)
    extrude(amount=-CUT_EXTRUDE30_DEPTH, mode=Mode.SUBTRACT)

    # Sketch38 → Cut-Extrude31 (cut)
    with BuildSketch(Plane(origin=(-6.149998633, 0, 0), x_dir=(0, 0, -1), z_dir=(1, 0, 0))):
        Polygon((-12.950000267, 32.213096915), (-12.950000267, 34.673092364), (-15.480001371, 34.673092364), (-15.480001371, 33.313093184), (-16.580001365, 33.313093184), (-16.980000685, 33.713092504), (-17.360000785, 33.713092504), (-18.200001593, 33.413091151), (-18.48, 33.038092254), (-18.48, 32.213096915), align=None)
    extrude(amount=-CUT_EXTRUDE31_DEPTH, mode=Mode.SUBTRACT)

    # Sketch39 → Cut-Extrude32 (cut)
    with BuildSketch(Plane.ZY.offset(-6.149998633)):
        Polygon((18.48, 32.213096915), (18.48, 33.038092254), (18.200001593, 33.413091151), (17.360000785, 33.713092504), (16.980000685, 33.713092504), (16.580001365, 33.313093184), (15.480001371, 33.313093184), (15.480001371, 34.673092364), (12.950000267, 34.673092364), (12.950000267, 32.213096915), align=None)
    extrude(amount=-CUT_EXTRUDE32_DEPTH, mode=Mode.SUBTRACT)

    # Sketch41 → Cut-Extrude33 (cut)
    with BuildSketch(Plane(origin=(0, 0, 15.480001371), x_dir=(-1, 0, 0), z_dir=(0, 0, -1))):
        Polygon((-13.451442893, 32.213070838), (-15.04997909, 32.213096915), (-15.04997909, 31.544283758), (-12.912088878, 30.446738359), align=None)
    extrude(amount=-CUT_EXTRUDE33_DEPTH, mode=Mode.SUBTRACT)

    # Sketch42 → Cut-Extrude34 (cut)
    with BuildSketch(Plane(origin=(0, 0, 15.480001371), x_dir=(-1, 0, 0), z_dir=(0, 0, -1))):
        Polygon((13.451442893, 32.213070838), (15.050001443, 32.213096915), (15.050001443, 29.734697946), align=None)
    extrude(amount=-CUT_EXTRUDE34_DEPTH, mode=Mode.SUBTRACT)


solid = part.part
